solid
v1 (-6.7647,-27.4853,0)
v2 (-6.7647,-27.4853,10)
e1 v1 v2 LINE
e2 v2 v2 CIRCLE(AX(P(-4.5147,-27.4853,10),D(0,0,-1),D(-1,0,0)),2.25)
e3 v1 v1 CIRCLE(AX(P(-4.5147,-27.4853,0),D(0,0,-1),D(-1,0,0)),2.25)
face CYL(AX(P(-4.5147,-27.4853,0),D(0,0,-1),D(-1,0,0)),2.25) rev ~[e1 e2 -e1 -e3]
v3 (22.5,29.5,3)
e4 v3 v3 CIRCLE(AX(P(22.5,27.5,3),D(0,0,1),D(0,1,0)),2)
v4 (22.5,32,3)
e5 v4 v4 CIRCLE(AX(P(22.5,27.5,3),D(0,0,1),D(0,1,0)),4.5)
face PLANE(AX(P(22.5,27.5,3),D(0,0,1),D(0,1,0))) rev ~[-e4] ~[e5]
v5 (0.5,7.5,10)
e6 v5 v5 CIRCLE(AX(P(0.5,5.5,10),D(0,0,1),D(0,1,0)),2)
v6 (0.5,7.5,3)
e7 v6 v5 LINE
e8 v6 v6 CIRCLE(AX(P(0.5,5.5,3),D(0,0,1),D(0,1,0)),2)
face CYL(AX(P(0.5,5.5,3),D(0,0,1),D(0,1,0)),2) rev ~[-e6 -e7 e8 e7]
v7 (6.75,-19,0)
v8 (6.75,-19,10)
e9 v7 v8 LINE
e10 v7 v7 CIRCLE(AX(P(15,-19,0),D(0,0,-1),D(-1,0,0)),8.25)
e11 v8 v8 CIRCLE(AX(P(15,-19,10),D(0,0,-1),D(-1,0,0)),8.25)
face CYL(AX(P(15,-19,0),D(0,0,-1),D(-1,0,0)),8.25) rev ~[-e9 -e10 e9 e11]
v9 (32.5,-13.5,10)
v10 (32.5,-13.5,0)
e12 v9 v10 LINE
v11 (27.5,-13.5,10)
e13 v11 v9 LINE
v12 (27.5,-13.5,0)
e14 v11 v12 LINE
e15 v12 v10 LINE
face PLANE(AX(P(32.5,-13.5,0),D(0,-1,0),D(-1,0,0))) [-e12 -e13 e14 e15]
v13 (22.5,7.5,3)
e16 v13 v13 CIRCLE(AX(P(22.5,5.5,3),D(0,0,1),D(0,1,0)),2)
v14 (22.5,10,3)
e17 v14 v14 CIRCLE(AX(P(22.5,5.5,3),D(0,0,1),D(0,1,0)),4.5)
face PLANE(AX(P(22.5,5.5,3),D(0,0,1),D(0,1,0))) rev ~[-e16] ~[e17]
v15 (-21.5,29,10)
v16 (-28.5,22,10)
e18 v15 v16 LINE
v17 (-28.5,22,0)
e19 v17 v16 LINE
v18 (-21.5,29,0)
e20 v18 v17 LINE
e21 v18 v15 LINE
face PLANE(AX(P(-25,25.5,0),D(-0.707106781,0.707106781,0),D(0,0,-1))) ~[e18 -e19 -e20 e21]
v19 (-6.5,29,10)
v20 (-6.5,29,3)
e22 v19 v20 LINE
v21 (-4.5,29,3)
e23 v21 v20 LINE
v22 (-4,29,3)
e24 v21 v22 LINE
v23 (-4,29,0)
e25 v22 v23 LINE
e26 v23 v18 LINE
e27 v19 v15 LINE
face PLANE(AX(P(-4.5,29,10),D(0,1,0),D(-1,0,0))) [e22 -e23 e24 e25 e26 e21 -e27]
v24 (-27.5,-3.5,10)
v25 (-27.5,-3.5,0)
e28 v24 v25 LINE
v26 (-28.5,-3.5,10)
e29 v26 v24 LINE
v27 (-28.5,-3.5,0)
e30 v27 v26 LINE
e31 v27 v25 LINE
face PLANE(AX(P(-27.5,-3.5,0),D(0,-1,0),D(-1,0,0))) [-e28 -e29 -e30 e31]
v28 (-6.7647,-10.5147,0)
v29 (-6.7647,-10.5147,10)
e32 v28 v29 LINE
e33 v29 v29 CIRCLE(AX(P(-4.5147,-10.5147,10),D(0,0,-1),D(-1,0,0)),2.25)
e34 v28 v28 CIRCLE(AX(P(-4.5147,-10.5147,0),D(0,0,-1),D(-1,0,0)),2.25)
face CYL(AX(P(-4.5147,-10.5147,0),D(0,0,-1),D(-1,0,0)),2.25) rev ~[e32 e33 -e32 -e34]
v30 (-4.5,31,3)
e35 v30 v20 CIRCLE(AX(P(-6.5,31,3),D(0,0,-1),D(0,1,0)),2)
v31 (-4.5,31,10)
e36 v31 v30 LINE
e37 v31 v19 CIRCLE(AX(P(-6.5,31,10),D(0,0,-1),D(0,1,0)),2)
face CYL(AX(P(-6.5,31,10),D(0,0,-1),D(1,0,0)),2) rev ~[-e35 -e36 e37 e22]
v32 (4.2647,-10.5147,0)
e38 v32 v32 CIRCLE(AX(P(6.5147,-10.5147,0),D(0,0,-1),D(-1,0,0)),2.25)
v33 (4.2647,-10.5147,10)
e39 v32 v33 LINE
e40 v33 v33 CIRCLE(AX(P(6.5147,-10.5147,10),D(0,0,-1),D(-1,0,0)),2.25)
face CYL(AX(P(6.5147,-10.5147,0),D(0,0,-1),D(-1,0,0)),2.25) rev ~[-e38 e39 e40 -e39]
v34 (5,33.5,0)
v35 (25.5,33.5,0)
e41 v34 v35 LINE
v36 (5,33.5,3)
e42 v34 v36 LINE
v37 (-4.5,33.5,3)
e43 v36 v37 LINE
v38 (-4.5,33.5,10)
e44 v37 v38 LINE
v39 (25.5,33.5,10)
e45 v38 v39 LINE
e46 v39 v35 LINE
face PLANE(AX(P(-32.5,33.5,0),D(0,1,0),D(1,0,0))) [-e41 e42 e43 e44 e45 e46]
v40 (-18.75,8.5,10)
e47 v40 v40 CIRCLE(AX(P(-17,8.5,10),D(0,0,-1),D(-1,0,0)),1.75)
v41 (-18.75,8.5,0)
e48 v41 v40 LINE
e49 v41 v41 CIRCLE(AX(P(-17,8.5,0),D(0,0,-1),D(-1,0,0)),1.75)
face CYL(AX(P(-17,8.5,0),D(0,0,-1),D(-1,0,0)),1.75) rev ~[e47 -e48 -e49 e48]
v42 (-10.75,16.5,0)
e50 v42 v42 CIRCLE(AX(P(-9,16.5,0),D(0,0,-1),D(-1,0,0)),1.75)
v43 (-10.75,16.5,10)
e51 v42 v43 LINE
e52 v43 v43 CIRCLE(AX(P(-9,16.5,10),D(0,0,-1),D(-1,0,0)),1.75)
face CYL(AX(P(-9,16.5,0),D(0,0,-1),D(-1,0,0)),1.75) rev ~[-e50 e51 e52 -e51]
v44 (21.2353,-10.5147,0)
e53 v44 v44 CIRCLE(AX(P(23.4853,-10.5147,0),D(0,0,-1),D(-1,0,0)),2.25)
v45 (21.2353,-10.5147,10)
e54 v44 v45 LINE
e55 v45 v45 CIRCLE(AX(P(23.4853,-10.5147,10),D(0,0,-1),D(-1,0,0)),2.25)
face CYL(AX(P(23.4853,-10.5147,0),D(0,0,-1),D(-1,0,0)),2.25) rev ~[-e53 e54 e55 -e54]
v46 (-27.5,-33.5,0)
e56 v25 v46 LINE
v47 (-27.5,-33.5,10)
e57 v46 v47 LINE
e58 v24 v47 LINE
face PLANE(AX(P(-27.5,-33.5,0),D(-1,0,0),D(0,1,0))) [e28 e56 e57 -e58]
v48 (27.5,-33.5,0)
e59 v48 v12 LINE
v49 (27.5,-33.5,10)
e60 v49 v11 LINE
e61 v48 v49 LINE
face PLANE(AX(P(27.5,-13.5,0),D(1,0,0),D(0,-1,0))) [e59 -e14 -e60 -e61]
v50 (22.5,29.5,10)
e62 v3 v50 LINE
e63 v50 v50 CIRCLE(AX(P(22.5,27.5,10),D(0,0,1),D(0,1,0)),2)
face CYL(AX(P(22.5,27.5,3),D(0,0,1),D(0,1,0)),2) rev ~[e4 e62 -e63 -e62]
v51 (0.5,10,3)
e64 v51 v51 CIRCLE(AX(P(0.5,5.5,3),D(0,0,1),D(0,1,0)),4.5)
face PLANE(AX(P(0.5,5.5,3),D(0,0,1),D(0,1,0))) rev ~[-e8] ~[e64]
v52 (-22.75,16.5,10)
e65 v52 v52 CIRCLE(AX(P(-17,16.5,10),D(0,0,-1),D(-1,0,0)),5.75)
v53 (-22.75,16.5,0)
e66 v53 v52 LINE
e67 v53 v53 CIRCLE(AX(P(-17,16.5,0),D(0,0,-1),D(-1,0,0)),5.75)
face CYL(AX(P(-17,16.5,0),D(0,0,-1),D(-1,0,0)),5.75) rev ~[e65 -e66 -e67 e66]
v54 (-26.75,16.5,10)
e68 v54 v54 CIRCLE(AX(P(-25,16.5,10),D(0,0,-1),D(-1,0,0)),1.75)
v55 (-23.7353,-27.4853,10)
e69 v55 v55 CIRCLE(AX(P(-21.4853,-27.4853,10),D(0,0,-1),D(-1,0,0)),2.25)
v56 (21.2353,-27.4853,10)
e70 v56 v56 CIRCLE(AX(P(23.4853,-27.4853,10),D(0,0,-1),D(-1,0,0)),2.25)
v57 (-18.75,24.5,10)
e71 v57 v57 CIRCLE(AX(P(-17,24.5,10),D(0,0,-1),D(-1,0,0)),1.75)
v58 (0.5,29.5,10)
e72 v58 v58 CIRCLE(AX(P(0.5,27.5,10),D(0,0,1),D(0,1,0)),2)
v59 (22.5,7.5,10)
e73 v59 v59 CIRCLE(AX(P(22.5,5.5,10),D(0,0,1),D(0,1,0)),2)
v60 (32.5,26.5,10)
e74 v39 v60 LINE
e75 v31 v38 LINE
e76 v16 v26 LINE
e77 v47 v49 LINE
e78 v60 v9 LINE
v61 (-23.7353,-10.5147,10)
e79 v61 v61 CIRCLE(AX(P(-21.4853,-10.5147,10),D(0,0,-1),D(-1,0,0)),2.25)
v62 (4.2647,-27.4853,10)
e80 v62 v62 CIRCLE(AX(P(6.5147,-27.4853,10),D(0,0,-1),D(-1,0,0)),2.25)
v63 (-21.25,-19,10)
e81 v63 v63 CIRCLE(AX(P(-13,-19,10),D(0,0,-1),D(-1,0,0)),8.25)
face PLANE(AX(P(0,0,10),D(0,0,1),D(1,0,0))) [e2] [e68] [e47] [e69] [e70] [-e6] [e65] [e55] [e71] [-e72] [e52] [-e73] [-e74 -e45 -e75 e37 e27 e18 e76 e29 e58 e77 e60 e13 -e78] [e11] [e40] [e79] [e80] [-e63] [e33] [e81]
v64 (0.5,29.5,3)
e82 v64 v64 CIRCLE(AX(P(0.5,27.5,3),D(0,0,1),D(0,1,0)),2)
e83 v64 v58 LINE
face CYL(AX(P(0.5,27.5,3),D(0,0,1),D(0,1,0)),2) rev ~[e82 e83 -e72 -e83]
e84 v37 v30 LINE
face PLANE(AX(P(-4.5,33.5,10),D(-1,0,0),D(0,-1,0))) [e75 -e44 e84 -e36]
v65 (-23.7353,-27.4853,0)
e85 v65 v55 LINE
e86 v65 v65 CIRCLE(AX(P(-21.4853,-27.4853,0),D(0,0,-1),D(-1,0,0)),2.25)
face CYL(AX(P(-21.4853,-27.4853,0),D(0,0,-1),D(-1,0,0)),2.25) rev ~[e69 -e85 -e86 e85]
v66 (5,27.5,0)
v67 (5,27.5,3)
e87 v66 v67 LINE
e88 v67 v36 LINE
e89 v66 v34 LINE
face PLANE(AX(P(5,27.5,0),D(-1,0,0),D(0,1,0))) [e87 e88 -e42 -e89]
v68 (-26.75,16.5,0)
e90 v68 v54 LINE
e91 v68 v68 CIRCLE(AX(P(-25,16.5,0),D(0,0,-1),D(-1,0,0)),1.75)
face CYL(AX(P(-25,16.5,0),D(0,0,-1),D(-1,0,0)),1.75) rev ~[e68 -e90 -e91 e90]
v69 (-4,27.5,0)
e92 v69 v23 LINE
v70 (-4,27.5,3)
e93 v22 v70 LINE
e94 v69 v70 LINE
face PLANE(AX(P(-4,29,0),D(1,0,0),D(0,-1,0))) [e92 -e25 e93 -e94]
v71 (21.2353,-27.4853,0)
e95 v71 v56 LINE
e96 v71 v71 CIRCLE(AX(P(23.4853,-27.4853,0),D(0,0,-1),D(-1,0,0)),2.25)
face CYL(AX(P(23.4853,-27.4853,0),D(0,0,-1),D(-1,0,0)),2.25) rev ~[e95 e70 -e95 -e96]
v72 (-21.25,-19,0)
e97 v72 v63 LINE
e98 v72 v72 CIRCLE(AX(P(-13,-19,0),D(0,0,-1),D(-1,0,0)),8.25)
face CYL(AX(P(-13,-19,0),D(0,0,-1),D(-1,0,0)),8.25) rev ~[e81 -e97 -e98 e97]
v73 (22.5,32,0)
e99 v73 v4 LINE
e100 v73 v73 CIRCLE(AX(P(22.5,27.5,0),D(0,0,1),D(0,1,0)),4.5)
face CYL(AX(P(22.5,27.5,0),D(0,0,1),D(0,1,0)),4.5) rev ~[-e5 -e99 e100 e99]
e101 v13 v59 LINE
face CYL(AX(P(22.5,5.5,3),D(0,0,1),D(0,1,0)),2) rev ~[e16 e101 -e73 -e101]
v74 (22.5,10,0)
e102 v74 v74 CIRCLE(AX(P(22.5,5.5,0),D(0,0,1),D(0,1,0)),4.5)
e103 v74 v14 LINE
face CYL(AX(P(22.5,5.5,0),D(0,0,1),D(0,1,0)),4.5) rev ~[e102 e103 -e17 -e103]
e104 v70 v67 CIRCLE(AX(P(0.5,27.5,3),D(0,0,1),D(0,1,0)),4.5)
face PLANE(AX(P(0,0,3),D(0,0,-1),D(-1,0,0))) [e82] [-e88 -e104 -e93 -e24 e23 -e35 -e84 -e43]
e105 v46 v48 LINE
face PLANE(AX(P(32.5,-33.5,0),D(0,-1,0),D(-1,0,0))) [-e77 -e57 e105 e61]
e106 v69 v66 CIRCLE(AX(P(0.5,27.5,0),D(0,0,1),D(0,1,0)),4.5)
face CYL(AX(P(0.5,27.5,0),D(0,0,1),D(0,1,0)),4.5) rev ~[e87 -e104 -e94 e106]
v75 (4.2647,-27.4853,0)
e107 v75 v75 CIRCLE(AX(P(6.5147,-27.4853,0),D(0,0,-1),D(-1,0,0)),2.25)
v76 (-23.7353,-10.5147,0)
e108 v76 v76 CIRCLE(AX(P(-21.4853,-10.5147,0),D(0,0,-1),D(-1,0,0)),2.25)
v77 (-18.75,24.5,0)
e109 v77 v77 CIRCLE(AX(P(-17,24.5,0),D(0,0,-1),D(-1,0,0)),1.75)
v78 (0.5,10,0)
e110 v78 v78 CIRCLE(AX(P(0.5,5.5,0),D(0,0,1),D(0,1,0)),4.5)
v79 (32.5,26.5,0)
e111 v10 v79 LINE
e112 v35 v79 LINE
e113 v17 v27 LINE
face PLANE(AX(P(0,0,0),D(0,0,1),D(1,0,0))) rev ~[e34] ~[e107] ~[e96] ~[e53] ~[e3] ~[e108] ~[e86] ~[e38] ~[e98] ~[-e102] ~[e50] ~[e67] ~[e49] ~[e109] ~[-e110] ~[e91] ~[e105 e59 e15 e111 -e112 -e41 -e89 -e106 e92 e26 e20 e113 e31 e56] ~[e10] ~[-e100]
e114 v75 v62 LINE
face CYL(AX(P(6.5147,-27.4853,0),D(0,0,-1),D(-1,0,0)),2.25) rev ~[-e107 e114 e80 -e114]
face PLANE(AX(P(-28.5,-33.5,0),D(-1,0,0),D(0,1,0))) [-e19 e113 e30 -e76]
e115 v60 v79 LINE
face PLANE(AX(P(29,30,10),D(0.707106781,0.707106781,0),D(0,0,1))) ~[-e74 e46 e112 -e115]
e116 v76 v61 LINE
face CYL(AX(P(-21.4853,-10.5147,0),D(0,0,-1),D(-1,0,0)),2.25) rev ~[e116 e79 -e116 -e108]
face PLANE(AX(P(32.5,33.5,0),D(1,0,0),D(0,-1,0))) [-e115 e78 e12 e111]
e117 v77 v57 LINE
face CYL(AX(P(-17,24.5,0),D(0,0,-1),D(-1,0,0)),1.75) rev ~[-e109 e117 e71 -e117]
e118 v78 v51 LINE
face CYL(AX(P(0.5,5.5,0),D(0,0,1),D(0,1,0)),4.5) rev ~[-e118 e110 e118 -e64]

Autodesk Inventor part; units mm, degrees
ref_plane "YZ Plane" through (0, 0, 0) normal (1, 0, 0) x (0, 1, 0)
ref_plane "XZ Plane" through (0, 0, 0) normal (0, 1, 0) x (-1, 0, 0)
ref_plane "XY Plane" through (0, 0, 0) normal (0, 0, 1) x (1, 0, 0)
sketch "Sketch1" plane through (0, 0, 0) normal (0, 0, 1) x (1, 0, 0)
  line L0 (-32.5, 33.5) -> (32.5, 33.5)
  line L1 (32.5, 33.5) -> (32.5, -33.5)
  line L2 (32.5, -33.5) -> (-32.5, -33.5)
  line L3 (-32.5, -33.5) -> (-32.5, 33.5)
  point P0 (0, 0)
  point P1 (0, 33.5)
  point P2 (-32.5, 0)
  dimension "d0" = 65
  dimension "d1" = 67
extrude "Extrusion1" add sketch "Sketch1" along normal blind 10
sketch "Sketch5" plane through (0, 0, 0) normal (0, 0, -1) x (-1, 0, 0)
  circle A0 centre (-0.5, 27.5) radius 2
  circle A1 centre (-0.5, 5.5) radius 2
  line L0 (32.5, 33.5) -> (32.5, -33.5) projected
  line L1 (-32.5, 33.5) -> (32.5, 33.5) projected
  circle A2 centre (-22.5, 5.5) radius 2
  circle A3 centre (-22.5, 27.5) radius 2
  line L2 (-32.5, -33.5) -> (-32.5, 33.5) projected
  point P0 (0, 0)
  dimension "d30" = 6
  dimension "d31" = 4
  dimension "d32" = 22
  dimension "d50" = 22
  dimension "d51" = 10
hole "Hole1" at (0.5, 5.5, 0) at (0.5, 27.5, 0) at (22.5, 5.5, 0) at (22.5, 27.5, 0) direction (0, 0, 1) diameter 4 depth 11 tip angle 118 counterbore diameter 9 counterbore depth 3
sketch "Sketch6" plane through (0, 0, 0) normal (0, 0, -1) x (-1, 0, 0)
  line L0 (4, 23) -> (-5, 23)
  line L1 (-5, 23) -> (-5, 33.5)
  line L2 (-5, 33.5) -> (4, 33.5)
  line L3 (4, 33.5) -> (4, 23)
  line L4 (-32.5, 33.5) -> (32.5, 33.5) projected
  circle A0 centre (-0.5, 27.5) radius 4.5 projected
  line L5 (6, 29) -> (4, 29)
  line L6 (4, 29) -> (4, 33.5)
  line L7 (4, 33.5) -> (6, 33.5)
  line L8 (6, 33.5) -> (6, 29)
  point P0 (0, 0)
  point P1 (-5, 27.5)
  point P2 (4, 27.5)
  point P3 (6, 33.5)
  point P4 (4, 33.5)
  point P5 (4, 29)
  dimension "d77" = 2
  dimension "d78" = 4.5
extrude "Extrusion4" cut sketch "Sketch6" against normal up to surface (3 mm away) contours A0 L1 L2 L3 | L3 L4 L8 L5
sketch "Sketch7" plane through (0, 0, 0) normal (0, 0, -1) x (-1, 0, 0)
  circle A0 centre (17, 16.5) radius 5.75
  circle A1 centre (17, 16.5) radius 8 construction
  circle A2 centre (17, 24.5) radius 1.75
  line L0 (6, 33.5) -> (32.5, 33.5) projected
  line L1 (32.5, 33.5) -> (32.5, -33.5) projected
  circle A3 centre (9, 16.5) radius 1.75
  circle A4 centre (17, 8.5) radius 1.75
  circle A5 centre (25, 16.5) radius 1.75
  line L2 (6, 33.5) -> (-5, 33.5) projected
  line L3 (-32.5, -33.5) -> (-32.5, 33.5) projected
  point P0 (4, 33.5)
  point P1 (25.5, 33.5)
  point P2 (32.5, 26.5)
  point P3 (-25.5, 33.5)
  point P4 (-32.5, 26.5)
  dimension "d55" = 16
  dimension "d52" = 11.5
  dimension "d54" = 3.5
  dimension "d61" = 360
  dimension "d65" = 17
  dimension "d66" = 49.5
extrude "Extrusion5" cut sketch "Sketch7" against normal through all
sketch "Sketch8" plane through (0, 0, 0) normal (0, 0, -1) x (-1, 0, 0)
  line L0 (32.5, -33.5) -> (-32.5, -33.5) projected
  line L1 (32.5, -33.5) -> (27.5, -33.5)
  line L2 (27.5, -33.5) -> (27.5, -3.5)
  line L3 (27.5, -3.5) -> (32.5, -3.5)
  line L4 (32.5, -3.5) -> (32.5, -33.5)
  line L5 (-27.5, -33.5) -> (-32.5, -33.5)
  line L6 (-32.5, -33.5) -> (-32.5, -13.5)
  line L7 (-32.5, -13.5) -> (-27.5, -13.5)
  line L8 (-27.5, -13.5) -> (-27.5, -33.5)
  line L9 (32.5, -33.5) -> (-32.5, -33.5) projected
  line L10 (-32.5, -33.5) -> (-32.5, 33.5) projected
  line L11 (32.5, 33.5) -> (32.5, -33.5) projected
  point P0 (0, 0)
  point P1 (-32.5, 26.5)
  point P2 (32.5, 26.5)
  dimension "d67" = 5
  dimension "d68" = 5
  dimension "d69" = 30
  dimension "d72" = 20
extrude "Extrusion6" cut sketch "Sketch8" against normal through all
sketch "Sketch9" plane through (0, 0, 10) normal (0, 0, 1) x (1, 0, 0)
  line L0 (-30.5, 33) -> (-7.5, 33)
  line L1 (-32.5, 33.5) -> (-4.5, 33.5)
  line L2 (-4.5, 33.5) -> (-4.5, 29)
  line L3 (-4.5, 29) -> (-32.5, 29)
  line L4 (-32.5, 29) -> (-32.5, 33.5)
  line L5 (-32.5, 33.5) -> (-32.5, -3.5) projected
  line L6 (32.5, 33.5) -> (-32.5, 33.5) projected
  point P0 (0, 0)
  point P1 (-32.5, 26.5)
  point P2 (25.5, 33.5)
  point P3 (-25.5, 33.5)
  dimension "d73" = 4
  dimension "d74" = 3
extrude "Extrusion7" cut sketch "Sketch9" against normal through all
sketch "Sketch10" plane through (0, 0, 0) normal (0, 0, -1) x (-1, 0, 0)
  circle A0 centre (-15, -19) radius 4
  circle A1 centre (-23.4853, -10.5147) radius 1.7
  circle A2 centre (-6.5147, -10.5147) radius 1.7
  circle A3 centre (-6.5147, -27.4853) radius 1.7
  circle A4 centre (-23.4853, -27.4853) radius 1.7
  circle A5 centre (-15, -19) radius 7.5
  line L0 (-25.1274, -6.5) -> (-4.8726, -6.5)
  line L1 (-4.8726, -6.5) -> (-2.5, -8.8726)
  line L2 (-2.5, -8.8726) -> (-2.5, -29.1274)
  line L3 (-2.5, -29.1274) -> (-4.8726, -31.5)
  line L4 (-4.8726, -31.5) -> (-25.1274, -31.5)
  line L5 (-25.1274, -31.5) -> (-27.5, -29.1274)
  line L6 (-27.5, -29.1274) -> (-27.5, -8.8726)
  line L7 (-27.5, -8.8726) -> (-25.1274, -6.5)
  circle A6 centre (13, -19) radius 4
  circle A7 centre (21.4853, -10.5147) radius 1.7
  circle A8 centre (21.4853, -27.4853) radius 1.7
  circle A9 centre (4.5147, -27.4853) radius 1.7
  circle A10 centre (4.5147, -10.5147) radius 1.7
  circle A11 centre (13, -19) radius 7.5
  line L8 (25.5, -8.8726) -> (25.5, -29.1274)
  line L9 (25.5, -29.1274) -> (23.1274, -31.5)
  line L10 (23.1274, -31.5) -> (2.8726, -31.5)
  line L11 (2.8726, -31.5) -> (0.5, -29.1274)
  line L12 (0.5, -29.1274) -> (0.5, -8.8726)
  line L13 (0.5, -8.8726) -> (2.8726, -6.5)
  line L14 (2.8726, -6.5) -> (23.1274, -6.5)
  line L15 (23.1274, -6.5) -> (25.5, -8.8726)
  circle A12 centre (-15, -19) radius 8.25
  circle A13 centre (13, -19) radius 8.25
  circle A14 centre (21.4853, -27.4853) radius 2.25
  circle A15 centre (4.5147, -27.4853) radius 2.25
  circle A16 centre (21.4853, -10.5147) radius 2.25
  circle A17 centre (4.5147, -10.5147) radius 2.25
  circle A18 centre (-6.5147, -27.4853) radius 2.25
  circle A19 centre (-23.4853, -27.4853) radius 2.25
  circle A20 centre (-23.4853, -10.5147) radius 2.25
  circle A21 centre (-6.5147, -10.5147) radius 2.25
  point P0 (0, 0)
  dimension "d79" = 16.5
  dimension "d80" = 16.5
  dimension "d81" = 4.5
  dimension "d82" = 4.5
  dimension "d83" = 4.5
  dimension "d84" = 4.5
  dimension "d85" = 4.5
  dimension "d86" = 4.5
  dimension "d87" = 4.5
  dimension "d88" = 4.5
extrude "Extrusion8" cut sketch "Sketch10" against normal through all contours A0 | A1 | A2 | A3 | A4 | A5 | A6 | A7 | A8 | A9 | A10 | A11 | A12 | A13 | A14 | A15 | A16 | A17 | A18 | A19 | A20 | A21
move faces "Move1" translate (4, 0, 0) faces at (-32.5, 18.1667, 3.3333)
chamfer "Chamfer2" distance 7 angle 45 2 edges at (-28.5, 29, 5) (32.5, 33.5, 5)
fillet "Fillet1" radius 2 1 edges at (-4.5, 29, 6.5)
equation "\"d50\" = d32"
equation "\"d68\" = d67"
equation "\"d80\" = d79"
equation "\"BendRadius\" = Thickness"
equation "\"BendReliefWidth\" = Thickness"
equation "\"BendReliefDepth\" = 0.5 * Thickness"
equation "\"CornerReliefSize\" = 4 * Thickness"
equation "\"MinimumRemnant\" = 2 * Thickness"
equation "\"TransitionRadius\" = BendRadius"
equation "\"JacobiRadiusSize\" = Thickness"
equation "\"GapSize\" = Thickness"
equation "\"Thickness\" = 0.5"
properties part number "0008-10-001" material "ABS Plastic"
